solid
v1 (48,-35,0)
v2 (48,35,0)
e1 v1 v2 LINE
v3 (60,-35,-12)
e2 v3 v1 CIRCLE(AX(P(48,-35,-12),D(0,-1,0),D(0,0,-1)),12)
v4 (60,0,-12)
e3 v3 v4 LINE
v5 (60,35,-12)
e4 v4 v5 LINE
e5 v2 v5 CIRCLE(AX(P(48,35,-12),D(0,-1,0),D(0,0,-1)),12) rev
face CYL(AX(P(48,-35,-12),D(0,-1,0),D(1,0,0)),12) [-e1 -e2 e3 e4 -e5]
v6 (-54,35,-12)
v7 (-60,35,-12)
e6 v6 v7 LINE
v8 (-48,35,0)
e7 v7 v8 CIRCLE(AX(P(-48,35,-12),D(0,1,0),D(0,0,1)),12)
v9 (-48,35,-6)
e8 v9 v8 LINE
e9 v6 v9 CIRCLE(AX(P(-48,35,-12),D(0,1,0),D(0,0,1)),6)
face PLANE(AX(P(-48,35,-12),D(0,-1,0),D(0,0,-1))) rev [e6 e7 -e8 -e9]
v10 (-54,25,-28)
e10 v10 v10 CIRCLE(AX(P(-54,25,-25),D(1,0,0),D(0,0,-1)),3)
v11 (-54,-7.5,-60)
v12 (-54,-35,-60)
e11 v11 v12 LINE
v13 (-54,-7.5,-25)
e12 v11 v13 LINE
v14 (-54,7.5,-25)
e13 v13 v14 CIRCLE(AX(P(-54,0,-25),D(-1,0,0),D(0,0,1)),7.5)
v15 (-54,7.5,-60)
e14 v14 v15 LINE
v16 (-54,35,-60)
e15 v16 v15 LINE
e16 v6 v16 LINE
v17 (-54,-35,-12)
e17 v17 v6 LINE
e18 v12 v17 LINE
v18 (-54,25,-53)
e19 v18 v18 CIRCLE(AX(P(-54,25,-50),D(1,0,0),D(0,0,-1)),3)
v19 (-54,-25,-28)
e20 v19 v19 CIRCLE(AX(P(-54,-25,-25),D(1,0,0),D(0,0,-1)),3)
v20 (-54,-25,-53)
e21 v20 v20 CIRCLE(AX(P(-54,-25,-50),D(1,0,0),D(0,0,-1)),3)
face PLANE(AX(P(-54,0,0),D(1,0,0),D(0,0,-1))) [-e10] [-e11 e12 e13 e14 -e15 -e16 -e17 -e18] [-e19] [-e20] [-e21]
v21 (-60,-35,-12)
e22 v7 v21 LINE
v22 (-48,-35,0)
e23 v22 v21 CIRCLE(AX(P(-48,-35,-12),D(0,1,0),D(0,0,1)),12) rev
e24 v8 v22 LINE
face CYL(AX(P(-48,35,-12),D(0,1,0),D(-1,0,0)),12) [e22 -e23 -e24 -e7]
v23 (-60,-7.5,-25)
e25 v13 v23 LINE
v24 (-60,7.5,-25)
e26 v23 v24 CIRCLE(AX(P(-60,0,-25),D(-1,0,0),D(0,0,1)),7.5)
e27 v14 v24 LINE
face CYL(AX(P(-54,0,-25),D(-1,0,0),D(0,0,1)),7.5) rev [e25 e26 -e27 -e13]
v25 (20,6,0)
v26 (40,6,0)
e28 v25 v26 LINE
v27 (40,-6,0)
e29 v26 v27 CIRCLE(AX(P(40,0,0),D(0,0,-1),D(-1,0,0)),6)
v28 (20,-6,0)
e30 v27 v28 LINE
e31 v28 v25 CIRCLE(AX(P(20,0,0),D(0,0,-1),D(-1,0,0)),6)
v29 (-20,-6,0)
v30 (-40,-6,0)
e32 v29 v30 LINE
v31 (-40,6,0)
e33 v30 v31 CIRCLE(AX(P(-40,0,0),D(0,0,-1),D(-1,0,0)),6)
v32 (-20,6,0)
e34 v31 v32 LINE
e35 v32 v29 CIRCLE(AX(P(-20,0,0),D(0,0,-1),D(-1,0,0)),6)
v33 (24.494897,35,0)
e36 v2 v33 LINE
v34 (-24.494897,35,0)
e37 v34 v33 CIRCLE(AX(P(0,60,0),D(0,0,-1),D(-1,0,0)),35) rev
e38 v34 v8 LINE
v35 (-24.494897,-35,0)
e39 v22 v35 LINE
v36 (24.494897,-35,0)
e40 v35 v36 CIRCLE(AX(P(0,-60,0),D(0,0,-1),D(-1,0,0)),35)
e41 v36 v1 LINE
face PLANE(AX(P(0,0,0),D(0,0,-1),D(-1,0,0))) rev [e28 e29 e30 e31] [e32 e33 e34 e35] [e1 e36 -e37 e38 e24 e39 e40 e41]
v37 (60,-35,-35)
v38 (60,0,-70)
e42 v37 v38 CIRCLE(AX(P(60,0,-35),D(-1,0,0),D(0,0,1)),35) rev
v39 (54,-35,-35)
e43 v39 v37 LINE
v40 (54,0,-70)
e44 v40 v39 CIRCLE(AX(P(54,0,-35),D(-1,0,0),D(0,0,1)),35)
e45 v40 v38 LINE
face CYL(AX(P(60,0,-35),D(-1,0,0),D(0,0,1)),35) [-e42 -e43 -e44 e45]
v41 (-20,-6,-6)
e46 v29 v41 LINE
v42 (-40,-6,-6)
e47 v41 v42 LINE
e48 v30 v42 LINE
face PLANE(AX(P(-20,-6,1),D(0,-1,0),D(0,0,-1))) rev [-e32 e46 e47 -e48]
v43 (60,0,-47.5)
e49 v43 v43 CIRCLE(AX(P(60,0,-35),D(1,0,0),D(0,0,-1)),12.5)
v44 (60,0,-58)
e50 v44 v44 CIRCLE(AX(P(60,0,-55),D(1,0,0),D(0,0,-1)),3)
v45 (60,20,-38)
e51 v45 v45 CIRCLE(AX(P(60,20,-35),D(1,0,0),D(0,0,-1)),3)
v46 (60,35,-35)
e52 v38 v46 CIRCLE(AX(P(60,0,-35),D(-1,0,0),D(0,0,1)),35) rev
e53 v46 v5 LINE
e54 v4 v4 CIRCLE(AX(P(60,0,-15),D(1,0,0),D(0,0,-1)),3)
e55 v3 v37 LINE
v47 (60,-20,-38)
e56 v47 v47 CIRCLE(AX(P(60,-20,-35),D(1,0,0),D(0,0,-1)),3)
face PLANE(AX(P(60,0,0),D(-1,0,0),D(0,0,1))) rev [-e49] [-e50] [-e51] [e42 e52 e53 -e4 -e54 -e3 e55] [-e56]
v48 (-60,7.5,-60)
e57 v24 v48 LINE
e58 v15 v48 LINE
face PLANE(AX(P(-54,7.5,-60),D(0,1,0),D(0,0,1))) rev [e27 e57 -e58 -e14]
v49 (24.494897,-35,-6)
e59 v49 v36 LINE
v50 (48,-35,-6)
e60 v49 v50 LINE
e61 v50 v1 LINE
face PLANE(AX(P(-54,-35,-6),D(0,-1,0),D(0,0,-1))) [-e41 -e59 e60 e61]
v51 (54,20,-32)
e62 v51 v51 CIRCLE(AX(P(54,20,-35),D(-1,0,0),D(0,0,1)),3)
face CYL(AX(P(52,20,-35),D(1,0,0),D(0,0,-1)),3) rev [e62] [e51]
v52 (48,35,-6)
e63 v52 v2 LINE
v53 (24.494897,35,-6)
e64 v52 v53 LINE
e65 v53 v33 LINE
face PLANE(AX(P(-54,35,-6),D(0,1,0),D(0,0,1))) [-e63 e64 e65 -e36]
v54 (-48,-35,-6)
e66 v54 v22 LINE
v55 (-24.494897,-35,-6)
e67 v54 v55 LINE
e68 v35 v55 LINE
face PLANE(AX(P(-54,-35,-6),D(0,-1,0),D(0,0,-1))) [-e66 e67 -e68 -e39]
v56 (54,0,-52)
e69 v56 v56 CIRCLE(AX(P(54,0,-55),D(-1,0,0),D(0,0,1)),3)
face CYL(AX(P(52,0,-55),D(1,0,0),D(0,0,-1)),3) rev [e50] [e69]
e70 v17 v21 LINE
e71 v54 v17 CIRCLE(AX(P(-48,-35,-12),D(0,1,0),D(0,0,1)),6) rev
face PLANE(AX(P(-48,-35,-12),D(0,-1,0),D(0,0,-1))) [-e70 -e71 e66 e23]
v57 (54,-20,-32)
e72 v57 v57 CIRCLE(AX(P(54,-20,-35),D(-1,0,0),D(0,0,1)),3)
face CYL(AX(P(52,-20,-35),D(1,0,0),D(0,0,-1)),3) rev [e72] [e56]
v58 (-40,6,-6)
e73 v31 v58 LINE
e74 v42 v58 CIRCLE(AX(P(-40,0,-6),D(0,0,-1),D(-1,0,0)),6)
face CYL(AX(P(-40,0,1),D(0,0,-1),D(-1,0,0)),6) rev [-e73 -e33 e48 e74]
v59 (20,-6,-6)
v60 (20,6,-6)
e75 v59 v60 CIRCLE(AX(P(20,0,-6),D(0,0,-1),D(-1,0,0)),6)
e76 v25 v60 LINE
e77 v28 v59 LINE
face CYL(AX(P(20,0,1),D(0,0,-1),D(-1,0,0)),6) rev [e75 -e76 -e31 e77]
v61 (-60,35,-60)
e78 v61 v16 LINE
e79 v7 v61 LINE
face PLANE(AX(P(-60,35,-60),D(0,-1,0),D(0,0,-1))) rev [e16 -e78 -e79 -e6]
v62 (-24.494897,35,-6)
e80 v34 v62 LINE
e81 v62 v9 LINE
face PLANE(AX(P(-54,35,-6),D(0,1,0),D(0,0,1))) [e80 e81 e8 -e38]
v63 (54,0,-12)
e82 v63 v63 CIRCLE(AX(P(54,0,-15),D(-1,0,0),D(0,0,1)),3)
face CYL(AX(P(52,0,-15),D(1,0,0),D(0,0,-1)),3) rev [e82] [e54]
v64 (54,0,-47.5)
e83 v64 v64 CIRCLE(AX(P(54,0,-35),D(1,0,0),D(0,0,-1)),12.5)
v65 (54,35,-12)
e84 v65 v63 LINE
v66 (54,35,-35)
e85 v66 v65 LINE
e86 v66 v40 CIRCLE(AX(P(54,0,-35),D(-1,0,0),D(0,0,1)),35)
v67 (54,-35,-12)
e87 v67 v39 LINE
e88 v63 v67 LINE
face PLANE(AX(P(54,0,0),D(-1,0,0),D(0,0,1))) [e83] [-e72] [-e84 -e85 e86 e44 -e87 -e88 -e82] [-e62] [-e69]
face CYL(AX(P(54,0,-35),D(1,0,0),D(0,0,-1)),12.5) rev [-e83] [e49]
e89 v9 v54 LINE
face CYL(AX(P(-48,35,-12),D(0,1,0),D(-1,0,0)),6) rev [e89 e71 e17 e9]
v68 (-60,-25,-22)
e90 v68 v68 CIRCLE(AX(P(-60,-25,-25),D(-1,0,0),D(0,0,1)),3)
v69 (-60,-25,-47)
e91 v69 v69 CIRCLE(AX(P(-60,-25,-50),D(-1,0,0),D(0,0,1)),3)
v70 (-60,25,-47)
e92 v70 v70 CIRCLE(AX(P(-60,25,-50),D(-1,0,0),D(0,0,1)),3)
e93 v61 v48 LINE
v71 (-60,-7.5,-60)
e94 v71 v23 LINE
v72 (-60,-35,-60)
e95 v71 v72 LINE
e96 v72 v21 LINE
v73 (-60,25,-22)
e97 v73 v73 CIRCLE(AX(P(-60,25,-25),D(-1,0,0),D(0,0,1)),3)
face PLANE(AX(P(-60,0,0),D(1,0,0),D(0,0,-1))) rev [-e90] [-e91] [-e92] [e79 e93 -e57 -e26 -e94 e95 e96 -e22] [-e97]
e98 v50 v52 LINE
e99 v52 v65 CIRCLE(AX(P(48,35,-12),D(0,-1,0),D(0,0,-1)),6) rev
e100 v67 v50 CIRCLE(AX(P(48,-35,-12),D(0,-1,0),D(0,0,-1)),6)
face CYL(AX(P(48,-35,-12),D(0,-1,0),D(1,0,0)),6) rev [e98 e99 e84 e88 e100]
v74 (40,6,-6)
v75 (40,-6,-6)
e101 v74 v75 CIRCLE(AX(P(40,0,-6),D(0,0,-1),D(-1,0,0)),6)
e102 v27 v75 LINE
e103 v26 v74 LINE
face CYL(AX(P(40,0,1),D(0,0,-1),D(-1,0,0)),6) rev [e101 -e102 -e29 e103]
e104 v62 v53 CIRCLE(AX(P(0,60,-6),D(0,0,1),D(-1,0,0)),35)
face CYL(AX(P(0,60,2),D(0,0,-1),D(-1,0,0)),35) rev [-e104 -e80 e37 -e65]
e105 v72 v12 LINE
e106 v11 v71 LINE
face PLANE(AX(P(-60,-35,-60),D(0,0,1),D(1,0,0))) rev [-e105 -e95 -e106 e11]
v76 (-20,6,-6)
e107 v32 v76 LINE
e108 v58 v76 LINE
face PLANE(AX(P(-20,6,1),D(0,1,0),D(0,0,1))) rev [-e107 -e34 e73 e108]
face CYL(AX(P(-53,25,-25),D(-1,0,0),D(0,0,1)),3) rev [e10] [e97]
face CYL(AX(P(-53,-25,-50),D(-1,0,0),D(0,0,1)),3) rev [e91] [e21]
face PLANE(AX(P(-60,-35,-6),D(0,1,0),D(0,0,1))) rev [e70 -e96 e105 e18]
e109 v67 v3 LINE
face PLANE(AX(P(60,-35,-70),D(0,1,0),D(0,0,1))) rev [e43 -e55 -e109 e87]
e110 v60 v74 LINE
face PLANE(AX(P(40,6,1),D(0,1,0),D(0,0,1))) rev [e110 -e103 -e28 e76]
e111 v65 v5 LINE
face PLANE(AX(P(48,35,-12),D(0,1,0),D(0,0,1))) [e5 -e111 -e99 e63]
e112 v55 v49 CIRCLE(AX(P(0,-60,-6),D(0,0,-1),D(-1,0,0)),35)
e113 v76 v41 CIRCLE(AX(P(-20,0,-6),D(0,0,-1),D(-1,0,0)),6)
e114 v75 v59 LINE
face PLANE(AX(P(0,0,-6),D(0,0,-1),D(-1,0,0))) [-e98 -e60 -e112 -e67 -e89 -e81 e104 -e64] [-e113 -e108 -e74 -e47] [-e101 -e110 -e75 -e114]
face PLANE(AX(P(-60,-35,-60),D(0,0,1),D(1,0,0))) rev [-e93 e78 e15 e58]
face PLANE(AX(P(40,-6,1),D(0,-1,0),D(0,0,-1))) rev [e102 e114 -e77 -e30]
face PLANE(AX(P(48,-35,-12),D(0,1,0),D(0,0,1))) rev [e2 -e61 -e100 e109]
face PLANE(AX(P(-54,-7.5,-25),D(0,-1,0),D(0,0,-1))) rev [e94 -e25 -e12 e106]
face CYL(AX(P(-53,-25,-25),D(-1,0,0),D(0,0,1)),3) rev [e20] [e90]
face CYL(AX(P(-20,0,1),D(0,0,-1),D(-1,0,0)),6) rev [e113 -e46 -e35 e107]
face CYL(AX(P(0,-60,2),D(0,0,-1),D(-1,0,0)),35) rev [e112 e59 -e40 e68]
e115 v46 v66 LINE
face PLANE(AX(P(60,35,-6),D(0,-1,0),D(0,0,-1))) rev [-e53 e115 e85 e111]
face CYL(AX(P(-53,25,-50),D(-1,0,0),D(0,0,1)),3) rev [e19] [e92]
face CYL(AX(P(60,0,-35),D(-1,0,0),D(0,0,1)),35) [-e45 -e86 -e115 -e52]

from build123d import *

# Parameters (mm, degrees)
SKETCH1_W                    = 108
SKETCH1_H                    = 70
BASE_FLANGE1_DEPTH           = 6
EDGE_FLANGE1_STRIP_W         = 36
EDGE_FLANGE1_STRIP_H         = 6
EDGE_FLANGE1_STRIP_CUT_DEPTH = 70
EDGE_FLANGE1_DEPTH           = 70
EDGE_FLANGE2_STRIP_W         = 36
EDGE_FLANGE2_STRIP_H         = 6
EDGE_FLANGE2_STRIP_CUT_DEPTH = 70
EDGE_FLANGE2_DEPTH           = 70
FILLET1_R                    = 35
CUT_EXTRUDE1_DEPTH           = 6
SKETCH15_R                   = 3
CUT_EXTRUDE2_DEPTH           = 7
LPATTERN1_COUNT              = 2
LPATTERN1_PITCH              = 50
CUT_EXTRUDE3_DEPTH           = 7
LPATTERN2_COUNT              = 2
LPATTERN2_PITCH              = 60
CUT_EXTRUDE4_DEPTH           = 8
SKETCH27_R                   = 3
CUT_EXTRUDE6_DEPTH           = 8
HOLE2_START                  = 54
HOLE2_OUTLINE_R              = 12.5
HOLE2_DEPTH                  = 6


# Read off the part's stored shape, not the designer's step: Hole2
# Sheet-metal steps are written as plain solids
with BuildPart() as part:
    # Sketch1 → Base-Flange1 (new body)
    with BuildSketch(Plane.XY):
        Rectangle(SKETCH1_W, SKETCH1_H)
    extrude(amount=-BASE_FLANGE1_DEPTH)

    # Edge-Flange1 strip (across the edge) → Edge-Flange1 strip cut (cut)
    with BuildSketch(Plane(origin=(54, 35, -6), x_dir=(-1, 0, 0), z_dir=(0, -1, 0))):
        with Locations((-12, -3)):
            Rectangle(EDGE_FLANGE1_STRIP_W, EDGE_FLANGE1_STRIP_H)
    extrude(amount=EDGE_FLANGE1_STRIP_CUT_DEPTH, mode=Mode.SUBTRACT)

    # Edge-Flange1 section (across the edge) → Edge-Flange1 (add)
    with BuildSketch(Plane(origin=(54, 35, -6), x_dir=(-1, 0, 0), z_dir=(0, -1, 0))):
        with BuildLine():
            Line((-6, 6), (-6, 64))
            Line((-6, 64), (0, 64))
            Line((0, 64), (0, 6))
            ThreePointArc((0, 6), (1.757359313, 1.757359313), (6, 0))
            Line((6, 0), (6, -6))
            ThreePointArc((6, -6), (-2.485281374, -2.485281374), (-6, 6))
        make_face()
    extrude(amount=EDGE_FLANGE1_DEPTH)

    # Edge-Flange2 strip (across the edge) → Edge-Flange2 strip cut (cut)
    with BuildSketch(Plane(origin=(-54, -35, -6), x_dir=(1, 0, 0), z_dir=(0, 1, 0))):
        with Locations((-12, -3)):
            Rectangle(EDGE_FLANGE2_STRIP_W, EDGE_FLANGE2_STRIP_H)
    extrude(amount=EDGE_FLANGE2_STRIP_CUT_DEPTH, mode=Mode.SUBTRACT)

    # Edge-Flange2 section (across the edge) → Edge-Flange2 (add)
    with BuildSketch(Plane(origin=(-54, -35, -6), x_dir=(1, 0, 0), z_dir=(0, 1, 0))):
        with BuildLine():
            Line((-6, 6), (-6, 54))
            Line((-6, 54), (0, 54))
            Line((0, 54), (0, 6))
            ThreePointArc((0, 6), (1.757359313, 1.757359313), (6, 0))
            Line((6, 0), (6, -6))
            ThreePointArc((6, -6), (-2.485281374, -2.485281374), (-6, 6))
        make_face()
    extrude(amount=EDGE_FLANGE2_DEPTH)

    # Fillet1
    fillet1_edges = [part.edges().sort_by_distance(p)[0] for p in [
        (57, -35, -70),
        (57, 35, -70),
    ]]
    fillet(fillet1_edges, radius=FILLET1_R - 0.0001)  # a hair under: the kernel refuses the full size

    # Sketch14 → Cut-Extrude1 (cut)
    with BuildSketch(Plane.ZY.offset(60)):
        with BuildLine():
            Line((-60, 7.5), (-60, -7.5))
            Line((-60, -7.5), (-25, -7.5))
            ThreePointArc((-25, -7.5), (-17.5, 0), (-25, 7.5))
            Line((-25, 7.5), (-60, 7.5))
        make_face()
    extrude(amount=-CUT_EXTRUDE1_DEPTH, mode=Mode.SUBTRACT)

    # Sketch15 → Cut-Extrude2 (cut)
    with BuildSketch(Plane.ZY.offset(60)):
        with Locations((-50, 25)):
            Circle(SKETCH15_R)
        with Locations((-25, 25)):
            Circle(SKETCH15_R)
    cut_extrude2 = extrude(amount=-CUT_EXTRUDE2_DEPTH, mode=Mode.SUBTRACT)

    # LPattern1: Cut-Extrude2 ×2
    with Locations(*[(0, -i * LPATTERN1_PITCH, 0) for i in range(1, LPATTERN1_COUNT)]):
        add(cut_extrude2, mode=Mode.SUBTRACT)

    # Sketch16 → Cut-Extrude3 (cut)
    with BuildSketch(Plane(origin=(0, 0, -6), x_dir=(-1, 0, 0), z_dir=(0, 0, -1))):
        with BuildLine():
            Line((-40, 6), (-20, 6))
            ThreePointArc((-20, 6), (-14, 0), (-20, -6))
            Line((-20, -6), (-40, -6))
            ThreePointArc((-40, -6), (-46, 0), (-40, 6))
        make_face()
    cut_extrude3 = extrude(amount=-CUT_EXTRUDE3_DEPTH, mode=Mode.SUBTRACT)

    # LPattern2: Cut-Extrude3 ×2
    with Locations(*[(-i * LPATTERN2_PITCH, 0, 0) for i in range(1, LPATTERN2_COUNT)]):
        add(cut_extrude3, mode=Mode.SUBTRACT)

    # Sketch18 → Cut-Extrude4 (cut)
    with BuildSketch(Plane(origin=(0, 0, -6), x_dir=(-1, 0, 0), z_dir=(0, 0, -1))):
        with BuildLine():
            Line((24.494897428, -35), (-24.494897428, -35))
            ThreePointArc((-24.494897428, -35), (0, -25), (24.494897428, -35))
        make_face()
    cut_extrude4 = extrude(amount=-CUT_EXTRUDE4_DEPTH, mode=Mode.SUBTRACT)

    # Sketch27 → Cut-Extrude6 (cut)
    with BuildSketch(Plane(origin=(60, 0, 0), x_dir=(0, 0, -1), z_dir=(1, 0, 0))):
        with Locations((55, 0)):
            Circle(SKETCH27_R)
        with Locations((35, 20)):
            Circle(SKETCH27_R)
        with Locations(Location((15, 0, 0), (0, 0, 180))):
            Circle(SKETCH27_R)
        with Locations((35, -20)):
            Circle(SKETCH27_R)
    extrude(amount=-CUT_EXTRUDE6_DEPTH, mode=Mode.SUBTRACT)

    # Hole2 outline → Hole2 (cut)
    with BuildSketch(Plane.YZ.offset(HOLE2_START)):
        with Locations((0, -35)):
            Circle(HOLE2_OUTLINE_R)
    extrude(amount=HOLE2_DEPTH, mode=Mode.SUBTRACT)

    # Mirror2: Cut-Extrude4 across plane
    add(cut_extrude4.mirror(Plane.ZX), mode=Mode.SUBTRACT)


solid = part.part
